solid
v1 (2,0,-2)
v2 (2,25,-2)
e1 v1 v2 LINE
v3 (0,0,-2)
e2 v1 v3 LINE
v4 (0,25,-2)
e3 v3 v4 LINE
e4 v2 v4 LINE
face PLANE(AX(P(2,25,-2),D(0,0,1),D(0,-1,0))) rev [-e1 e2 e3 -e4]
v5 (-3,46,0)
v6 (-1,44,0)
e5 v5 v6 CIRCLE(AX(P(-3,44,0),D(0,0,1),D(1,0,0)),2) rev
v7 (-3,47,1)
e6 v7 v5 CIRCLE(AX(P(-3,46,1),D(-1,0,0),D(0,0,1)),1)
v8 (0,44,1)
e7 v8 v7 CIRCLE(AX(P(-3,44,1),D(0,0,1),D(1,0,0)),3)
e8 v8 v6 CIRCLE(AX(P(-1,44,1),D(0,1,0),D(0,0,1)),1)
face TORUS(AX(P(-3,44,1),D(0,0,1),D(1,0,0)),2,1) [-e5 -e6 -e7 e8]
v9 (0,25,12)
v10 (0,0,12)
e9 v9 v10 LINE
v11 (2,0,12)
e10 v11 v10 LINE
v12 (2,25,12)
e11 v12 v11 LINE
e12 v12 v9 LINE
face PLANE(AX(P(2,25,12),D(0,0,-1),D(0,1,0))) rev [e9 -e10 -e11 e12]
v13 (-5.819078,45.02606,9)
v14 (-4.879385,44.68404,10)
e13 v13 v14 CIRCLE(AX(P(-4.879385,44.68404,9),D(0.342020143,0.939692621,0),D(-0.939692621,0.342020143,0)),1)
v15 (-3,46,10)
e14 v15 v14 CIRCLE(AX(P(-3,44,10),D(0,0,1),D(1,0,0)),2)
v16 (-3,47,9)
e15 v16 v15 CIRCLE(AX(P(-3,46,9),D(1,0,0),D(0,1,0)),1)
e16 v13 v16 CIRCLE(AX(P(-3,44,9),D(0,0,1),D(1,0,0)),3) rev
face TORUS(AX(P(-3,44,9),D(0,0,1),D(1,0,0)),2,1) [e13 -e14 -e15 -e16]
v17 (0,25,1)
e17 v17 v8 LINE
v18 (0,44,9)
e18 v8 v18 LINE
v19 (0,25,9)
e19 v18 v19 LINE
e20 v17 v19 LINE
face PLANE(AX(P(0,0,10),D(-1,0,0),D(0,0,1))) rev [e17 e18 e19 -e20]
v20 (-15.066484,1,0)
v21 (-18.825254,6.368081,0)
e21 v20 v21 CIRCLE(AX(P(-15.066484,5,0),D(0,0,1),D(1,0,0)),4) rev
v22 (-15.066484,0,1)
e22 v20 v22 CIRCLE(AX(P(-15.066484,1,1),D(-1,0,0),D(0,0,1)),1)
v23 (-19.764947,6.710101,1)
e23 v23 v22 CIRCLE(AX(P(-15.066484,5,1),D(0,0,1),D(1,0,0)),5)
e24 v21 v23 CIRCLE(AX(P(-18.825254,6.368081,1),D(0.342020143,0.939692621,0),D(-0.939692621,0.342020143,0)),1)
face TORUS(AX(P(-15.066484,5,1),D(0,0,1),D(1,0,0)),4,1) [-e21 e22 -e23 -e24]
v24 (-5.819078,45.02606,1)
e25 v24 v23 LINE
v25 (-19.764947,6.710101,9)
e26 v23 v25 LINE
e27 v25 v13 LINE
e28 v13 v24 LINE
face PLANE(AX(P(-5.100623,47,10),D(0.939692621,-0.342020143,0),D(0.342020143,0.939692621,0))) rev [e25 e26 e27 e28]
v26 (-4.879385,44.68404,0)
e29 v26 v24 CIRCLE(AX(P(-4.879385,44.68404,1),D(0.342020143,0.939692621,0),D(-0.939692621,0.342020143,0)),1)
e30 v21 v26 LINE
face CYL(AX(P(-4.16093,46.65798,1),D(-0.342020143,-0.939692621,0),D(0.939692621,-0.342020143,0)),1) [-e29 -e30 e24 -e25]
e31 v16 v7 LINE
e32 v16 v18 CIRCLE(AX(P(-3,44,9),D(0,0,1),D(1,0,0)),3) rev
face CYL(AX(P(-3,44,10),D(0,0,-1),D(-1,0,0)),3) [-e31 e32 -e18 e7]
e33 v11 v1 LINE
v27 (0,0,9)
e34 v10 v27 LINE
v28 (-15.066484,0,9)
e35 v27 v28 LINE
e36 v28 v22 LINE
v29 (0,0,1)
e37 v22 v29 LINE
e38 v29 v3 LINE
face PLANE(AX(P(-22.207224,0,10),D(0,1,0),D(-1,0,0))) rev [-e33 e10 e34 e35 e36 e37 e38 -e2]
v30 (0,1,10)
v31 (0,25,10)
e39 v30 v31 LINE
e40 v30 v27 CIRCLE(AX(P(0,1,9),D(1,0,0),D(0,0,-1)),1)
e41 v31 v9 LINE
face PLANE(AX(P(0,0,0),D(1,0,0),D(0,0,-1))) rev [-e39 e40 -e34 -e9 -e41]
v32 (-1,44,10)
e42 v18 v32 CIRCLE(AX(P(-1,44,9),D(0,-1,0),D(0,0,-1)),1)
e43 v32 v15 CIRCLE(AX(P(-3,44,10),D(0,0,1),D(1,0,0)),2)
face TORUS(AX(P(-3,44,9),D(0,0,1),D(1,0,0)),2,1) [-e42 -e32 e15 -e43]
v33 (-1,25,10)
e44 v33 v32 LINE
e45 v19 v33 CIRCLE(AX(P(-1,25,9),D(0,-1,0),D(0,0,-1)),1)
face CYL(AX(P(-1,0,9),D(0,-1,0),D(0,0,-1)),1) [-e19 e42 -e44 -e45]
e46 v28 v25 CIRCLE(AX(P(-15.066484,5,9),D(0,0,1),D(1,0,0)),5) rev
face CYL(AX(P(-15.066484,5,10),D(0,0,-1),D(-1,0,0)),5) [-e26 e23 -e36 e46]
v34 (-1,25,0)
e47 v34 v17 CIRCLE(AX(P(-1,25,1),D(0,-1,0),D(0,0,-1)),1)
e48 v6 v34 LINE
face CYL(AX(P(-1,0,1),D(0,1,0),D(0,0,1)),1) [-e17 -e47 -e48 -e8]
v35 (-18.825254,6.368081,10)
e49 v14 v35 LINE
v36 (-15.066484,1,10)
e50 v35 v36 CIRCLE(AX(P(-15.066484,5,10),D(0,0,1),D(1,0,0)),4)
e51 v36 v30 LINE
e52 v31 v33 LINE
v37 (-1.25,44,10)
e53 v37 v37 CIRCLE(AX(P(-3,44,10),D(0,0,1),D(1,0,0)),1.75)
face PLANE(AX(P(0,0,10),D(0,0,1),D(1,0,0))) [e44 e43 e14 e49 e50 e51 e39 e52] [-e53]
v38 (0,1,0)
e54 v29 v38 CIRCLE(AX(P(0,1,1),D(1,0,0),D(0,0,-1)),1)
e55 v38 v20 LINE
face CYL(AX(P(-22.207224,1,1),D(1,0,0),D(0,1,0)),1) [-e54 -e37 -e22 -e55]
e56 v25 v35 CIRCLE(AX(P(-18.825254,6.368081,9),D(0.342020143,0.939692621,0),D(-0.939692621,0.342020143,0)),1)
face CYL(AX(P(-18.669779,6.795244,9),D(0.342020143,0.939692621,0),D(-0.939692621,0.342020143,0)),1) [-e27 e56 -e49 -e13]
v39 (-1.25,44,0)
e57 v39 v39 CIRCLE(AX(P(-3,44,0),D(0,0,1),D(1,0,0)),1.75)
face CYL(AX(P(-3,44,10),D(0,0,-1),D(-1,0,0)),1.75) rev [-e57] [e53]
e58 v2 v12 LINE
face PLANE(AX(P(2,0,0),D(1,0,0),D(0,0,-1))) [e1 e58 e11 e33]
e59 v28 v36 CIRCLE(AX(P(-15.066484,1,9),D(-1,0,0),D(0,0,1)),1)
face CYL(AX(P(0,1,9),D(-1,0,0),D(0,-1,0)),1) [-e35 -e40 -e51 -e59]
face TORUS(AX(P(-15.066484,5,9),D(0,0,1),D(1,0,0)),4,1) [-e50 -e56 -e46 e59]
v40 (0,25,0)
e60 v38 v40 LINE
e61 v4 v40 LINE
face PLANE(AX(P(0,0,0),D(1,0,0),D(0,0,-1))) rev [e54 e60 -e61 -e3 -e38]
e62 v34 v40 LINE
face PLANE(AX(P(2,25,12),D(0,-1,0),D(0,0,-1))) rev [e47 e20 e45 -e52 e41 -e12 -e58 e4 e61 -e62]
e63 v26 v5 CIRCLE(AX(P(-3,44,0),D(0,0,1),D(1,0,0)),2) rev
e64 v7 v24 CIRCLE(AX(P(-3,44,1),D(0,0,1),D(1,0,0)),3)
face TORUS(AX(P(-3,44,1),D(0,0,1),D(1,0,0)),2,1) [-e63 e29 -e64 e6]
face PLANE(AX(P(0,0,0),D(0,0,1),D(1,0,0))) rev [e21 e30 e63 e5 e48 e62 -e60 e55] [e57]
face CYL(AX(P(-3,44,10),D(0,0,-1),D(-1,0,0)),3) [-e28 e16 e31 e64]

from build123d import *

# Parameters (mm, degrees)
SKIZZE1_R                       = 1.75
AUFSATZ_LINEAR_AUSTRAGEN1_DEPTH = 10
SKIZZE2_W                       = 14
SKIZZE2_H                       = 25
AUFSATZ_LINEAR_AUSTRAGEN2_DEPTH = 2
VERRUNDUNG5_R                   = 3
VERRUNDUNG6_R                   = 5
VERRUNDUNG7_R                   = 1


with BuildPart() as part:
    # Skizze1 → Aufsatz-Linear austragen1 (new body)
    with BuildSketch(Plane.XY):
        Polygon((0, 0), (0, 47), (-5.100622615, 47), (-22.207223625, 0), align=None)
        with Locations((-3, 44)):
            Circle(SKIZZE1_R, mode=Mode.SUBTRACT)
    extrude(amount=AUFSATZ_LINEAR_AUSTRAGEN1_DEPTH)

    # Skizze2 → Aufsatz-Linear austragen2 (add)
    with BuildSketch(Plane(origin=(0, 0, 0), x_dir=(0, 0, -1), z_dir=(1, 0, 0))):
        with Locations((-5, 12.5)):
            Rectangle(SKIZZE2_W, SKIZZE2_H)
    extrude(amount=AUFSATZ_LINEAR_AUSTRAGEN2_DEPTH)

    # Verrundung5
    verrundung5_edges = [part.edges().sort_by_distance(p)[0] for p in [
        (-5.100622615, 47, 5),
        (0, 47, 5),
    ]]
    fillet(verrundung5_edges, radius=VERRUNDUNG5_R - 0.0001)  # a hair under: the kernel refuses the full size

    # Verrundung6
    verrundung6_edges = [part.edges().sort_by_distance(p)[0] for p in [
        (-22.207223625, 0, 5),
    ]]
    fillet(verrundung6_edges, radius=VERRUNDUNG6_R)

    # Verrundung7
    verrundung7_edges = [part.edges().sort_by_distance(p)[0] for p in [
        (-4.720741972, 46.457474218, 0),
        (-0.878650367, 46.121349633, 0),
        (0, 34.50005, 0),
        (0, 34.50005, 10),
        (-4.720741972, 46.457474218, 10),
        (-0.878650367, 46.121349633, 10),
        (-19.162243813, 2.132117818, 0),
        (-19.162243813, 2.132117818, 10),
        (-7.533241796, 0, 10),
        (-7.533241796, 0, 0),
        (-12.792000305, 25.868113472, 0),
        (-12.792000305, 25.868113472, 10),
    ]]
    fillet(verrundung7_edges, radius=VERRUNDUNG7_R)


solid = part.part
